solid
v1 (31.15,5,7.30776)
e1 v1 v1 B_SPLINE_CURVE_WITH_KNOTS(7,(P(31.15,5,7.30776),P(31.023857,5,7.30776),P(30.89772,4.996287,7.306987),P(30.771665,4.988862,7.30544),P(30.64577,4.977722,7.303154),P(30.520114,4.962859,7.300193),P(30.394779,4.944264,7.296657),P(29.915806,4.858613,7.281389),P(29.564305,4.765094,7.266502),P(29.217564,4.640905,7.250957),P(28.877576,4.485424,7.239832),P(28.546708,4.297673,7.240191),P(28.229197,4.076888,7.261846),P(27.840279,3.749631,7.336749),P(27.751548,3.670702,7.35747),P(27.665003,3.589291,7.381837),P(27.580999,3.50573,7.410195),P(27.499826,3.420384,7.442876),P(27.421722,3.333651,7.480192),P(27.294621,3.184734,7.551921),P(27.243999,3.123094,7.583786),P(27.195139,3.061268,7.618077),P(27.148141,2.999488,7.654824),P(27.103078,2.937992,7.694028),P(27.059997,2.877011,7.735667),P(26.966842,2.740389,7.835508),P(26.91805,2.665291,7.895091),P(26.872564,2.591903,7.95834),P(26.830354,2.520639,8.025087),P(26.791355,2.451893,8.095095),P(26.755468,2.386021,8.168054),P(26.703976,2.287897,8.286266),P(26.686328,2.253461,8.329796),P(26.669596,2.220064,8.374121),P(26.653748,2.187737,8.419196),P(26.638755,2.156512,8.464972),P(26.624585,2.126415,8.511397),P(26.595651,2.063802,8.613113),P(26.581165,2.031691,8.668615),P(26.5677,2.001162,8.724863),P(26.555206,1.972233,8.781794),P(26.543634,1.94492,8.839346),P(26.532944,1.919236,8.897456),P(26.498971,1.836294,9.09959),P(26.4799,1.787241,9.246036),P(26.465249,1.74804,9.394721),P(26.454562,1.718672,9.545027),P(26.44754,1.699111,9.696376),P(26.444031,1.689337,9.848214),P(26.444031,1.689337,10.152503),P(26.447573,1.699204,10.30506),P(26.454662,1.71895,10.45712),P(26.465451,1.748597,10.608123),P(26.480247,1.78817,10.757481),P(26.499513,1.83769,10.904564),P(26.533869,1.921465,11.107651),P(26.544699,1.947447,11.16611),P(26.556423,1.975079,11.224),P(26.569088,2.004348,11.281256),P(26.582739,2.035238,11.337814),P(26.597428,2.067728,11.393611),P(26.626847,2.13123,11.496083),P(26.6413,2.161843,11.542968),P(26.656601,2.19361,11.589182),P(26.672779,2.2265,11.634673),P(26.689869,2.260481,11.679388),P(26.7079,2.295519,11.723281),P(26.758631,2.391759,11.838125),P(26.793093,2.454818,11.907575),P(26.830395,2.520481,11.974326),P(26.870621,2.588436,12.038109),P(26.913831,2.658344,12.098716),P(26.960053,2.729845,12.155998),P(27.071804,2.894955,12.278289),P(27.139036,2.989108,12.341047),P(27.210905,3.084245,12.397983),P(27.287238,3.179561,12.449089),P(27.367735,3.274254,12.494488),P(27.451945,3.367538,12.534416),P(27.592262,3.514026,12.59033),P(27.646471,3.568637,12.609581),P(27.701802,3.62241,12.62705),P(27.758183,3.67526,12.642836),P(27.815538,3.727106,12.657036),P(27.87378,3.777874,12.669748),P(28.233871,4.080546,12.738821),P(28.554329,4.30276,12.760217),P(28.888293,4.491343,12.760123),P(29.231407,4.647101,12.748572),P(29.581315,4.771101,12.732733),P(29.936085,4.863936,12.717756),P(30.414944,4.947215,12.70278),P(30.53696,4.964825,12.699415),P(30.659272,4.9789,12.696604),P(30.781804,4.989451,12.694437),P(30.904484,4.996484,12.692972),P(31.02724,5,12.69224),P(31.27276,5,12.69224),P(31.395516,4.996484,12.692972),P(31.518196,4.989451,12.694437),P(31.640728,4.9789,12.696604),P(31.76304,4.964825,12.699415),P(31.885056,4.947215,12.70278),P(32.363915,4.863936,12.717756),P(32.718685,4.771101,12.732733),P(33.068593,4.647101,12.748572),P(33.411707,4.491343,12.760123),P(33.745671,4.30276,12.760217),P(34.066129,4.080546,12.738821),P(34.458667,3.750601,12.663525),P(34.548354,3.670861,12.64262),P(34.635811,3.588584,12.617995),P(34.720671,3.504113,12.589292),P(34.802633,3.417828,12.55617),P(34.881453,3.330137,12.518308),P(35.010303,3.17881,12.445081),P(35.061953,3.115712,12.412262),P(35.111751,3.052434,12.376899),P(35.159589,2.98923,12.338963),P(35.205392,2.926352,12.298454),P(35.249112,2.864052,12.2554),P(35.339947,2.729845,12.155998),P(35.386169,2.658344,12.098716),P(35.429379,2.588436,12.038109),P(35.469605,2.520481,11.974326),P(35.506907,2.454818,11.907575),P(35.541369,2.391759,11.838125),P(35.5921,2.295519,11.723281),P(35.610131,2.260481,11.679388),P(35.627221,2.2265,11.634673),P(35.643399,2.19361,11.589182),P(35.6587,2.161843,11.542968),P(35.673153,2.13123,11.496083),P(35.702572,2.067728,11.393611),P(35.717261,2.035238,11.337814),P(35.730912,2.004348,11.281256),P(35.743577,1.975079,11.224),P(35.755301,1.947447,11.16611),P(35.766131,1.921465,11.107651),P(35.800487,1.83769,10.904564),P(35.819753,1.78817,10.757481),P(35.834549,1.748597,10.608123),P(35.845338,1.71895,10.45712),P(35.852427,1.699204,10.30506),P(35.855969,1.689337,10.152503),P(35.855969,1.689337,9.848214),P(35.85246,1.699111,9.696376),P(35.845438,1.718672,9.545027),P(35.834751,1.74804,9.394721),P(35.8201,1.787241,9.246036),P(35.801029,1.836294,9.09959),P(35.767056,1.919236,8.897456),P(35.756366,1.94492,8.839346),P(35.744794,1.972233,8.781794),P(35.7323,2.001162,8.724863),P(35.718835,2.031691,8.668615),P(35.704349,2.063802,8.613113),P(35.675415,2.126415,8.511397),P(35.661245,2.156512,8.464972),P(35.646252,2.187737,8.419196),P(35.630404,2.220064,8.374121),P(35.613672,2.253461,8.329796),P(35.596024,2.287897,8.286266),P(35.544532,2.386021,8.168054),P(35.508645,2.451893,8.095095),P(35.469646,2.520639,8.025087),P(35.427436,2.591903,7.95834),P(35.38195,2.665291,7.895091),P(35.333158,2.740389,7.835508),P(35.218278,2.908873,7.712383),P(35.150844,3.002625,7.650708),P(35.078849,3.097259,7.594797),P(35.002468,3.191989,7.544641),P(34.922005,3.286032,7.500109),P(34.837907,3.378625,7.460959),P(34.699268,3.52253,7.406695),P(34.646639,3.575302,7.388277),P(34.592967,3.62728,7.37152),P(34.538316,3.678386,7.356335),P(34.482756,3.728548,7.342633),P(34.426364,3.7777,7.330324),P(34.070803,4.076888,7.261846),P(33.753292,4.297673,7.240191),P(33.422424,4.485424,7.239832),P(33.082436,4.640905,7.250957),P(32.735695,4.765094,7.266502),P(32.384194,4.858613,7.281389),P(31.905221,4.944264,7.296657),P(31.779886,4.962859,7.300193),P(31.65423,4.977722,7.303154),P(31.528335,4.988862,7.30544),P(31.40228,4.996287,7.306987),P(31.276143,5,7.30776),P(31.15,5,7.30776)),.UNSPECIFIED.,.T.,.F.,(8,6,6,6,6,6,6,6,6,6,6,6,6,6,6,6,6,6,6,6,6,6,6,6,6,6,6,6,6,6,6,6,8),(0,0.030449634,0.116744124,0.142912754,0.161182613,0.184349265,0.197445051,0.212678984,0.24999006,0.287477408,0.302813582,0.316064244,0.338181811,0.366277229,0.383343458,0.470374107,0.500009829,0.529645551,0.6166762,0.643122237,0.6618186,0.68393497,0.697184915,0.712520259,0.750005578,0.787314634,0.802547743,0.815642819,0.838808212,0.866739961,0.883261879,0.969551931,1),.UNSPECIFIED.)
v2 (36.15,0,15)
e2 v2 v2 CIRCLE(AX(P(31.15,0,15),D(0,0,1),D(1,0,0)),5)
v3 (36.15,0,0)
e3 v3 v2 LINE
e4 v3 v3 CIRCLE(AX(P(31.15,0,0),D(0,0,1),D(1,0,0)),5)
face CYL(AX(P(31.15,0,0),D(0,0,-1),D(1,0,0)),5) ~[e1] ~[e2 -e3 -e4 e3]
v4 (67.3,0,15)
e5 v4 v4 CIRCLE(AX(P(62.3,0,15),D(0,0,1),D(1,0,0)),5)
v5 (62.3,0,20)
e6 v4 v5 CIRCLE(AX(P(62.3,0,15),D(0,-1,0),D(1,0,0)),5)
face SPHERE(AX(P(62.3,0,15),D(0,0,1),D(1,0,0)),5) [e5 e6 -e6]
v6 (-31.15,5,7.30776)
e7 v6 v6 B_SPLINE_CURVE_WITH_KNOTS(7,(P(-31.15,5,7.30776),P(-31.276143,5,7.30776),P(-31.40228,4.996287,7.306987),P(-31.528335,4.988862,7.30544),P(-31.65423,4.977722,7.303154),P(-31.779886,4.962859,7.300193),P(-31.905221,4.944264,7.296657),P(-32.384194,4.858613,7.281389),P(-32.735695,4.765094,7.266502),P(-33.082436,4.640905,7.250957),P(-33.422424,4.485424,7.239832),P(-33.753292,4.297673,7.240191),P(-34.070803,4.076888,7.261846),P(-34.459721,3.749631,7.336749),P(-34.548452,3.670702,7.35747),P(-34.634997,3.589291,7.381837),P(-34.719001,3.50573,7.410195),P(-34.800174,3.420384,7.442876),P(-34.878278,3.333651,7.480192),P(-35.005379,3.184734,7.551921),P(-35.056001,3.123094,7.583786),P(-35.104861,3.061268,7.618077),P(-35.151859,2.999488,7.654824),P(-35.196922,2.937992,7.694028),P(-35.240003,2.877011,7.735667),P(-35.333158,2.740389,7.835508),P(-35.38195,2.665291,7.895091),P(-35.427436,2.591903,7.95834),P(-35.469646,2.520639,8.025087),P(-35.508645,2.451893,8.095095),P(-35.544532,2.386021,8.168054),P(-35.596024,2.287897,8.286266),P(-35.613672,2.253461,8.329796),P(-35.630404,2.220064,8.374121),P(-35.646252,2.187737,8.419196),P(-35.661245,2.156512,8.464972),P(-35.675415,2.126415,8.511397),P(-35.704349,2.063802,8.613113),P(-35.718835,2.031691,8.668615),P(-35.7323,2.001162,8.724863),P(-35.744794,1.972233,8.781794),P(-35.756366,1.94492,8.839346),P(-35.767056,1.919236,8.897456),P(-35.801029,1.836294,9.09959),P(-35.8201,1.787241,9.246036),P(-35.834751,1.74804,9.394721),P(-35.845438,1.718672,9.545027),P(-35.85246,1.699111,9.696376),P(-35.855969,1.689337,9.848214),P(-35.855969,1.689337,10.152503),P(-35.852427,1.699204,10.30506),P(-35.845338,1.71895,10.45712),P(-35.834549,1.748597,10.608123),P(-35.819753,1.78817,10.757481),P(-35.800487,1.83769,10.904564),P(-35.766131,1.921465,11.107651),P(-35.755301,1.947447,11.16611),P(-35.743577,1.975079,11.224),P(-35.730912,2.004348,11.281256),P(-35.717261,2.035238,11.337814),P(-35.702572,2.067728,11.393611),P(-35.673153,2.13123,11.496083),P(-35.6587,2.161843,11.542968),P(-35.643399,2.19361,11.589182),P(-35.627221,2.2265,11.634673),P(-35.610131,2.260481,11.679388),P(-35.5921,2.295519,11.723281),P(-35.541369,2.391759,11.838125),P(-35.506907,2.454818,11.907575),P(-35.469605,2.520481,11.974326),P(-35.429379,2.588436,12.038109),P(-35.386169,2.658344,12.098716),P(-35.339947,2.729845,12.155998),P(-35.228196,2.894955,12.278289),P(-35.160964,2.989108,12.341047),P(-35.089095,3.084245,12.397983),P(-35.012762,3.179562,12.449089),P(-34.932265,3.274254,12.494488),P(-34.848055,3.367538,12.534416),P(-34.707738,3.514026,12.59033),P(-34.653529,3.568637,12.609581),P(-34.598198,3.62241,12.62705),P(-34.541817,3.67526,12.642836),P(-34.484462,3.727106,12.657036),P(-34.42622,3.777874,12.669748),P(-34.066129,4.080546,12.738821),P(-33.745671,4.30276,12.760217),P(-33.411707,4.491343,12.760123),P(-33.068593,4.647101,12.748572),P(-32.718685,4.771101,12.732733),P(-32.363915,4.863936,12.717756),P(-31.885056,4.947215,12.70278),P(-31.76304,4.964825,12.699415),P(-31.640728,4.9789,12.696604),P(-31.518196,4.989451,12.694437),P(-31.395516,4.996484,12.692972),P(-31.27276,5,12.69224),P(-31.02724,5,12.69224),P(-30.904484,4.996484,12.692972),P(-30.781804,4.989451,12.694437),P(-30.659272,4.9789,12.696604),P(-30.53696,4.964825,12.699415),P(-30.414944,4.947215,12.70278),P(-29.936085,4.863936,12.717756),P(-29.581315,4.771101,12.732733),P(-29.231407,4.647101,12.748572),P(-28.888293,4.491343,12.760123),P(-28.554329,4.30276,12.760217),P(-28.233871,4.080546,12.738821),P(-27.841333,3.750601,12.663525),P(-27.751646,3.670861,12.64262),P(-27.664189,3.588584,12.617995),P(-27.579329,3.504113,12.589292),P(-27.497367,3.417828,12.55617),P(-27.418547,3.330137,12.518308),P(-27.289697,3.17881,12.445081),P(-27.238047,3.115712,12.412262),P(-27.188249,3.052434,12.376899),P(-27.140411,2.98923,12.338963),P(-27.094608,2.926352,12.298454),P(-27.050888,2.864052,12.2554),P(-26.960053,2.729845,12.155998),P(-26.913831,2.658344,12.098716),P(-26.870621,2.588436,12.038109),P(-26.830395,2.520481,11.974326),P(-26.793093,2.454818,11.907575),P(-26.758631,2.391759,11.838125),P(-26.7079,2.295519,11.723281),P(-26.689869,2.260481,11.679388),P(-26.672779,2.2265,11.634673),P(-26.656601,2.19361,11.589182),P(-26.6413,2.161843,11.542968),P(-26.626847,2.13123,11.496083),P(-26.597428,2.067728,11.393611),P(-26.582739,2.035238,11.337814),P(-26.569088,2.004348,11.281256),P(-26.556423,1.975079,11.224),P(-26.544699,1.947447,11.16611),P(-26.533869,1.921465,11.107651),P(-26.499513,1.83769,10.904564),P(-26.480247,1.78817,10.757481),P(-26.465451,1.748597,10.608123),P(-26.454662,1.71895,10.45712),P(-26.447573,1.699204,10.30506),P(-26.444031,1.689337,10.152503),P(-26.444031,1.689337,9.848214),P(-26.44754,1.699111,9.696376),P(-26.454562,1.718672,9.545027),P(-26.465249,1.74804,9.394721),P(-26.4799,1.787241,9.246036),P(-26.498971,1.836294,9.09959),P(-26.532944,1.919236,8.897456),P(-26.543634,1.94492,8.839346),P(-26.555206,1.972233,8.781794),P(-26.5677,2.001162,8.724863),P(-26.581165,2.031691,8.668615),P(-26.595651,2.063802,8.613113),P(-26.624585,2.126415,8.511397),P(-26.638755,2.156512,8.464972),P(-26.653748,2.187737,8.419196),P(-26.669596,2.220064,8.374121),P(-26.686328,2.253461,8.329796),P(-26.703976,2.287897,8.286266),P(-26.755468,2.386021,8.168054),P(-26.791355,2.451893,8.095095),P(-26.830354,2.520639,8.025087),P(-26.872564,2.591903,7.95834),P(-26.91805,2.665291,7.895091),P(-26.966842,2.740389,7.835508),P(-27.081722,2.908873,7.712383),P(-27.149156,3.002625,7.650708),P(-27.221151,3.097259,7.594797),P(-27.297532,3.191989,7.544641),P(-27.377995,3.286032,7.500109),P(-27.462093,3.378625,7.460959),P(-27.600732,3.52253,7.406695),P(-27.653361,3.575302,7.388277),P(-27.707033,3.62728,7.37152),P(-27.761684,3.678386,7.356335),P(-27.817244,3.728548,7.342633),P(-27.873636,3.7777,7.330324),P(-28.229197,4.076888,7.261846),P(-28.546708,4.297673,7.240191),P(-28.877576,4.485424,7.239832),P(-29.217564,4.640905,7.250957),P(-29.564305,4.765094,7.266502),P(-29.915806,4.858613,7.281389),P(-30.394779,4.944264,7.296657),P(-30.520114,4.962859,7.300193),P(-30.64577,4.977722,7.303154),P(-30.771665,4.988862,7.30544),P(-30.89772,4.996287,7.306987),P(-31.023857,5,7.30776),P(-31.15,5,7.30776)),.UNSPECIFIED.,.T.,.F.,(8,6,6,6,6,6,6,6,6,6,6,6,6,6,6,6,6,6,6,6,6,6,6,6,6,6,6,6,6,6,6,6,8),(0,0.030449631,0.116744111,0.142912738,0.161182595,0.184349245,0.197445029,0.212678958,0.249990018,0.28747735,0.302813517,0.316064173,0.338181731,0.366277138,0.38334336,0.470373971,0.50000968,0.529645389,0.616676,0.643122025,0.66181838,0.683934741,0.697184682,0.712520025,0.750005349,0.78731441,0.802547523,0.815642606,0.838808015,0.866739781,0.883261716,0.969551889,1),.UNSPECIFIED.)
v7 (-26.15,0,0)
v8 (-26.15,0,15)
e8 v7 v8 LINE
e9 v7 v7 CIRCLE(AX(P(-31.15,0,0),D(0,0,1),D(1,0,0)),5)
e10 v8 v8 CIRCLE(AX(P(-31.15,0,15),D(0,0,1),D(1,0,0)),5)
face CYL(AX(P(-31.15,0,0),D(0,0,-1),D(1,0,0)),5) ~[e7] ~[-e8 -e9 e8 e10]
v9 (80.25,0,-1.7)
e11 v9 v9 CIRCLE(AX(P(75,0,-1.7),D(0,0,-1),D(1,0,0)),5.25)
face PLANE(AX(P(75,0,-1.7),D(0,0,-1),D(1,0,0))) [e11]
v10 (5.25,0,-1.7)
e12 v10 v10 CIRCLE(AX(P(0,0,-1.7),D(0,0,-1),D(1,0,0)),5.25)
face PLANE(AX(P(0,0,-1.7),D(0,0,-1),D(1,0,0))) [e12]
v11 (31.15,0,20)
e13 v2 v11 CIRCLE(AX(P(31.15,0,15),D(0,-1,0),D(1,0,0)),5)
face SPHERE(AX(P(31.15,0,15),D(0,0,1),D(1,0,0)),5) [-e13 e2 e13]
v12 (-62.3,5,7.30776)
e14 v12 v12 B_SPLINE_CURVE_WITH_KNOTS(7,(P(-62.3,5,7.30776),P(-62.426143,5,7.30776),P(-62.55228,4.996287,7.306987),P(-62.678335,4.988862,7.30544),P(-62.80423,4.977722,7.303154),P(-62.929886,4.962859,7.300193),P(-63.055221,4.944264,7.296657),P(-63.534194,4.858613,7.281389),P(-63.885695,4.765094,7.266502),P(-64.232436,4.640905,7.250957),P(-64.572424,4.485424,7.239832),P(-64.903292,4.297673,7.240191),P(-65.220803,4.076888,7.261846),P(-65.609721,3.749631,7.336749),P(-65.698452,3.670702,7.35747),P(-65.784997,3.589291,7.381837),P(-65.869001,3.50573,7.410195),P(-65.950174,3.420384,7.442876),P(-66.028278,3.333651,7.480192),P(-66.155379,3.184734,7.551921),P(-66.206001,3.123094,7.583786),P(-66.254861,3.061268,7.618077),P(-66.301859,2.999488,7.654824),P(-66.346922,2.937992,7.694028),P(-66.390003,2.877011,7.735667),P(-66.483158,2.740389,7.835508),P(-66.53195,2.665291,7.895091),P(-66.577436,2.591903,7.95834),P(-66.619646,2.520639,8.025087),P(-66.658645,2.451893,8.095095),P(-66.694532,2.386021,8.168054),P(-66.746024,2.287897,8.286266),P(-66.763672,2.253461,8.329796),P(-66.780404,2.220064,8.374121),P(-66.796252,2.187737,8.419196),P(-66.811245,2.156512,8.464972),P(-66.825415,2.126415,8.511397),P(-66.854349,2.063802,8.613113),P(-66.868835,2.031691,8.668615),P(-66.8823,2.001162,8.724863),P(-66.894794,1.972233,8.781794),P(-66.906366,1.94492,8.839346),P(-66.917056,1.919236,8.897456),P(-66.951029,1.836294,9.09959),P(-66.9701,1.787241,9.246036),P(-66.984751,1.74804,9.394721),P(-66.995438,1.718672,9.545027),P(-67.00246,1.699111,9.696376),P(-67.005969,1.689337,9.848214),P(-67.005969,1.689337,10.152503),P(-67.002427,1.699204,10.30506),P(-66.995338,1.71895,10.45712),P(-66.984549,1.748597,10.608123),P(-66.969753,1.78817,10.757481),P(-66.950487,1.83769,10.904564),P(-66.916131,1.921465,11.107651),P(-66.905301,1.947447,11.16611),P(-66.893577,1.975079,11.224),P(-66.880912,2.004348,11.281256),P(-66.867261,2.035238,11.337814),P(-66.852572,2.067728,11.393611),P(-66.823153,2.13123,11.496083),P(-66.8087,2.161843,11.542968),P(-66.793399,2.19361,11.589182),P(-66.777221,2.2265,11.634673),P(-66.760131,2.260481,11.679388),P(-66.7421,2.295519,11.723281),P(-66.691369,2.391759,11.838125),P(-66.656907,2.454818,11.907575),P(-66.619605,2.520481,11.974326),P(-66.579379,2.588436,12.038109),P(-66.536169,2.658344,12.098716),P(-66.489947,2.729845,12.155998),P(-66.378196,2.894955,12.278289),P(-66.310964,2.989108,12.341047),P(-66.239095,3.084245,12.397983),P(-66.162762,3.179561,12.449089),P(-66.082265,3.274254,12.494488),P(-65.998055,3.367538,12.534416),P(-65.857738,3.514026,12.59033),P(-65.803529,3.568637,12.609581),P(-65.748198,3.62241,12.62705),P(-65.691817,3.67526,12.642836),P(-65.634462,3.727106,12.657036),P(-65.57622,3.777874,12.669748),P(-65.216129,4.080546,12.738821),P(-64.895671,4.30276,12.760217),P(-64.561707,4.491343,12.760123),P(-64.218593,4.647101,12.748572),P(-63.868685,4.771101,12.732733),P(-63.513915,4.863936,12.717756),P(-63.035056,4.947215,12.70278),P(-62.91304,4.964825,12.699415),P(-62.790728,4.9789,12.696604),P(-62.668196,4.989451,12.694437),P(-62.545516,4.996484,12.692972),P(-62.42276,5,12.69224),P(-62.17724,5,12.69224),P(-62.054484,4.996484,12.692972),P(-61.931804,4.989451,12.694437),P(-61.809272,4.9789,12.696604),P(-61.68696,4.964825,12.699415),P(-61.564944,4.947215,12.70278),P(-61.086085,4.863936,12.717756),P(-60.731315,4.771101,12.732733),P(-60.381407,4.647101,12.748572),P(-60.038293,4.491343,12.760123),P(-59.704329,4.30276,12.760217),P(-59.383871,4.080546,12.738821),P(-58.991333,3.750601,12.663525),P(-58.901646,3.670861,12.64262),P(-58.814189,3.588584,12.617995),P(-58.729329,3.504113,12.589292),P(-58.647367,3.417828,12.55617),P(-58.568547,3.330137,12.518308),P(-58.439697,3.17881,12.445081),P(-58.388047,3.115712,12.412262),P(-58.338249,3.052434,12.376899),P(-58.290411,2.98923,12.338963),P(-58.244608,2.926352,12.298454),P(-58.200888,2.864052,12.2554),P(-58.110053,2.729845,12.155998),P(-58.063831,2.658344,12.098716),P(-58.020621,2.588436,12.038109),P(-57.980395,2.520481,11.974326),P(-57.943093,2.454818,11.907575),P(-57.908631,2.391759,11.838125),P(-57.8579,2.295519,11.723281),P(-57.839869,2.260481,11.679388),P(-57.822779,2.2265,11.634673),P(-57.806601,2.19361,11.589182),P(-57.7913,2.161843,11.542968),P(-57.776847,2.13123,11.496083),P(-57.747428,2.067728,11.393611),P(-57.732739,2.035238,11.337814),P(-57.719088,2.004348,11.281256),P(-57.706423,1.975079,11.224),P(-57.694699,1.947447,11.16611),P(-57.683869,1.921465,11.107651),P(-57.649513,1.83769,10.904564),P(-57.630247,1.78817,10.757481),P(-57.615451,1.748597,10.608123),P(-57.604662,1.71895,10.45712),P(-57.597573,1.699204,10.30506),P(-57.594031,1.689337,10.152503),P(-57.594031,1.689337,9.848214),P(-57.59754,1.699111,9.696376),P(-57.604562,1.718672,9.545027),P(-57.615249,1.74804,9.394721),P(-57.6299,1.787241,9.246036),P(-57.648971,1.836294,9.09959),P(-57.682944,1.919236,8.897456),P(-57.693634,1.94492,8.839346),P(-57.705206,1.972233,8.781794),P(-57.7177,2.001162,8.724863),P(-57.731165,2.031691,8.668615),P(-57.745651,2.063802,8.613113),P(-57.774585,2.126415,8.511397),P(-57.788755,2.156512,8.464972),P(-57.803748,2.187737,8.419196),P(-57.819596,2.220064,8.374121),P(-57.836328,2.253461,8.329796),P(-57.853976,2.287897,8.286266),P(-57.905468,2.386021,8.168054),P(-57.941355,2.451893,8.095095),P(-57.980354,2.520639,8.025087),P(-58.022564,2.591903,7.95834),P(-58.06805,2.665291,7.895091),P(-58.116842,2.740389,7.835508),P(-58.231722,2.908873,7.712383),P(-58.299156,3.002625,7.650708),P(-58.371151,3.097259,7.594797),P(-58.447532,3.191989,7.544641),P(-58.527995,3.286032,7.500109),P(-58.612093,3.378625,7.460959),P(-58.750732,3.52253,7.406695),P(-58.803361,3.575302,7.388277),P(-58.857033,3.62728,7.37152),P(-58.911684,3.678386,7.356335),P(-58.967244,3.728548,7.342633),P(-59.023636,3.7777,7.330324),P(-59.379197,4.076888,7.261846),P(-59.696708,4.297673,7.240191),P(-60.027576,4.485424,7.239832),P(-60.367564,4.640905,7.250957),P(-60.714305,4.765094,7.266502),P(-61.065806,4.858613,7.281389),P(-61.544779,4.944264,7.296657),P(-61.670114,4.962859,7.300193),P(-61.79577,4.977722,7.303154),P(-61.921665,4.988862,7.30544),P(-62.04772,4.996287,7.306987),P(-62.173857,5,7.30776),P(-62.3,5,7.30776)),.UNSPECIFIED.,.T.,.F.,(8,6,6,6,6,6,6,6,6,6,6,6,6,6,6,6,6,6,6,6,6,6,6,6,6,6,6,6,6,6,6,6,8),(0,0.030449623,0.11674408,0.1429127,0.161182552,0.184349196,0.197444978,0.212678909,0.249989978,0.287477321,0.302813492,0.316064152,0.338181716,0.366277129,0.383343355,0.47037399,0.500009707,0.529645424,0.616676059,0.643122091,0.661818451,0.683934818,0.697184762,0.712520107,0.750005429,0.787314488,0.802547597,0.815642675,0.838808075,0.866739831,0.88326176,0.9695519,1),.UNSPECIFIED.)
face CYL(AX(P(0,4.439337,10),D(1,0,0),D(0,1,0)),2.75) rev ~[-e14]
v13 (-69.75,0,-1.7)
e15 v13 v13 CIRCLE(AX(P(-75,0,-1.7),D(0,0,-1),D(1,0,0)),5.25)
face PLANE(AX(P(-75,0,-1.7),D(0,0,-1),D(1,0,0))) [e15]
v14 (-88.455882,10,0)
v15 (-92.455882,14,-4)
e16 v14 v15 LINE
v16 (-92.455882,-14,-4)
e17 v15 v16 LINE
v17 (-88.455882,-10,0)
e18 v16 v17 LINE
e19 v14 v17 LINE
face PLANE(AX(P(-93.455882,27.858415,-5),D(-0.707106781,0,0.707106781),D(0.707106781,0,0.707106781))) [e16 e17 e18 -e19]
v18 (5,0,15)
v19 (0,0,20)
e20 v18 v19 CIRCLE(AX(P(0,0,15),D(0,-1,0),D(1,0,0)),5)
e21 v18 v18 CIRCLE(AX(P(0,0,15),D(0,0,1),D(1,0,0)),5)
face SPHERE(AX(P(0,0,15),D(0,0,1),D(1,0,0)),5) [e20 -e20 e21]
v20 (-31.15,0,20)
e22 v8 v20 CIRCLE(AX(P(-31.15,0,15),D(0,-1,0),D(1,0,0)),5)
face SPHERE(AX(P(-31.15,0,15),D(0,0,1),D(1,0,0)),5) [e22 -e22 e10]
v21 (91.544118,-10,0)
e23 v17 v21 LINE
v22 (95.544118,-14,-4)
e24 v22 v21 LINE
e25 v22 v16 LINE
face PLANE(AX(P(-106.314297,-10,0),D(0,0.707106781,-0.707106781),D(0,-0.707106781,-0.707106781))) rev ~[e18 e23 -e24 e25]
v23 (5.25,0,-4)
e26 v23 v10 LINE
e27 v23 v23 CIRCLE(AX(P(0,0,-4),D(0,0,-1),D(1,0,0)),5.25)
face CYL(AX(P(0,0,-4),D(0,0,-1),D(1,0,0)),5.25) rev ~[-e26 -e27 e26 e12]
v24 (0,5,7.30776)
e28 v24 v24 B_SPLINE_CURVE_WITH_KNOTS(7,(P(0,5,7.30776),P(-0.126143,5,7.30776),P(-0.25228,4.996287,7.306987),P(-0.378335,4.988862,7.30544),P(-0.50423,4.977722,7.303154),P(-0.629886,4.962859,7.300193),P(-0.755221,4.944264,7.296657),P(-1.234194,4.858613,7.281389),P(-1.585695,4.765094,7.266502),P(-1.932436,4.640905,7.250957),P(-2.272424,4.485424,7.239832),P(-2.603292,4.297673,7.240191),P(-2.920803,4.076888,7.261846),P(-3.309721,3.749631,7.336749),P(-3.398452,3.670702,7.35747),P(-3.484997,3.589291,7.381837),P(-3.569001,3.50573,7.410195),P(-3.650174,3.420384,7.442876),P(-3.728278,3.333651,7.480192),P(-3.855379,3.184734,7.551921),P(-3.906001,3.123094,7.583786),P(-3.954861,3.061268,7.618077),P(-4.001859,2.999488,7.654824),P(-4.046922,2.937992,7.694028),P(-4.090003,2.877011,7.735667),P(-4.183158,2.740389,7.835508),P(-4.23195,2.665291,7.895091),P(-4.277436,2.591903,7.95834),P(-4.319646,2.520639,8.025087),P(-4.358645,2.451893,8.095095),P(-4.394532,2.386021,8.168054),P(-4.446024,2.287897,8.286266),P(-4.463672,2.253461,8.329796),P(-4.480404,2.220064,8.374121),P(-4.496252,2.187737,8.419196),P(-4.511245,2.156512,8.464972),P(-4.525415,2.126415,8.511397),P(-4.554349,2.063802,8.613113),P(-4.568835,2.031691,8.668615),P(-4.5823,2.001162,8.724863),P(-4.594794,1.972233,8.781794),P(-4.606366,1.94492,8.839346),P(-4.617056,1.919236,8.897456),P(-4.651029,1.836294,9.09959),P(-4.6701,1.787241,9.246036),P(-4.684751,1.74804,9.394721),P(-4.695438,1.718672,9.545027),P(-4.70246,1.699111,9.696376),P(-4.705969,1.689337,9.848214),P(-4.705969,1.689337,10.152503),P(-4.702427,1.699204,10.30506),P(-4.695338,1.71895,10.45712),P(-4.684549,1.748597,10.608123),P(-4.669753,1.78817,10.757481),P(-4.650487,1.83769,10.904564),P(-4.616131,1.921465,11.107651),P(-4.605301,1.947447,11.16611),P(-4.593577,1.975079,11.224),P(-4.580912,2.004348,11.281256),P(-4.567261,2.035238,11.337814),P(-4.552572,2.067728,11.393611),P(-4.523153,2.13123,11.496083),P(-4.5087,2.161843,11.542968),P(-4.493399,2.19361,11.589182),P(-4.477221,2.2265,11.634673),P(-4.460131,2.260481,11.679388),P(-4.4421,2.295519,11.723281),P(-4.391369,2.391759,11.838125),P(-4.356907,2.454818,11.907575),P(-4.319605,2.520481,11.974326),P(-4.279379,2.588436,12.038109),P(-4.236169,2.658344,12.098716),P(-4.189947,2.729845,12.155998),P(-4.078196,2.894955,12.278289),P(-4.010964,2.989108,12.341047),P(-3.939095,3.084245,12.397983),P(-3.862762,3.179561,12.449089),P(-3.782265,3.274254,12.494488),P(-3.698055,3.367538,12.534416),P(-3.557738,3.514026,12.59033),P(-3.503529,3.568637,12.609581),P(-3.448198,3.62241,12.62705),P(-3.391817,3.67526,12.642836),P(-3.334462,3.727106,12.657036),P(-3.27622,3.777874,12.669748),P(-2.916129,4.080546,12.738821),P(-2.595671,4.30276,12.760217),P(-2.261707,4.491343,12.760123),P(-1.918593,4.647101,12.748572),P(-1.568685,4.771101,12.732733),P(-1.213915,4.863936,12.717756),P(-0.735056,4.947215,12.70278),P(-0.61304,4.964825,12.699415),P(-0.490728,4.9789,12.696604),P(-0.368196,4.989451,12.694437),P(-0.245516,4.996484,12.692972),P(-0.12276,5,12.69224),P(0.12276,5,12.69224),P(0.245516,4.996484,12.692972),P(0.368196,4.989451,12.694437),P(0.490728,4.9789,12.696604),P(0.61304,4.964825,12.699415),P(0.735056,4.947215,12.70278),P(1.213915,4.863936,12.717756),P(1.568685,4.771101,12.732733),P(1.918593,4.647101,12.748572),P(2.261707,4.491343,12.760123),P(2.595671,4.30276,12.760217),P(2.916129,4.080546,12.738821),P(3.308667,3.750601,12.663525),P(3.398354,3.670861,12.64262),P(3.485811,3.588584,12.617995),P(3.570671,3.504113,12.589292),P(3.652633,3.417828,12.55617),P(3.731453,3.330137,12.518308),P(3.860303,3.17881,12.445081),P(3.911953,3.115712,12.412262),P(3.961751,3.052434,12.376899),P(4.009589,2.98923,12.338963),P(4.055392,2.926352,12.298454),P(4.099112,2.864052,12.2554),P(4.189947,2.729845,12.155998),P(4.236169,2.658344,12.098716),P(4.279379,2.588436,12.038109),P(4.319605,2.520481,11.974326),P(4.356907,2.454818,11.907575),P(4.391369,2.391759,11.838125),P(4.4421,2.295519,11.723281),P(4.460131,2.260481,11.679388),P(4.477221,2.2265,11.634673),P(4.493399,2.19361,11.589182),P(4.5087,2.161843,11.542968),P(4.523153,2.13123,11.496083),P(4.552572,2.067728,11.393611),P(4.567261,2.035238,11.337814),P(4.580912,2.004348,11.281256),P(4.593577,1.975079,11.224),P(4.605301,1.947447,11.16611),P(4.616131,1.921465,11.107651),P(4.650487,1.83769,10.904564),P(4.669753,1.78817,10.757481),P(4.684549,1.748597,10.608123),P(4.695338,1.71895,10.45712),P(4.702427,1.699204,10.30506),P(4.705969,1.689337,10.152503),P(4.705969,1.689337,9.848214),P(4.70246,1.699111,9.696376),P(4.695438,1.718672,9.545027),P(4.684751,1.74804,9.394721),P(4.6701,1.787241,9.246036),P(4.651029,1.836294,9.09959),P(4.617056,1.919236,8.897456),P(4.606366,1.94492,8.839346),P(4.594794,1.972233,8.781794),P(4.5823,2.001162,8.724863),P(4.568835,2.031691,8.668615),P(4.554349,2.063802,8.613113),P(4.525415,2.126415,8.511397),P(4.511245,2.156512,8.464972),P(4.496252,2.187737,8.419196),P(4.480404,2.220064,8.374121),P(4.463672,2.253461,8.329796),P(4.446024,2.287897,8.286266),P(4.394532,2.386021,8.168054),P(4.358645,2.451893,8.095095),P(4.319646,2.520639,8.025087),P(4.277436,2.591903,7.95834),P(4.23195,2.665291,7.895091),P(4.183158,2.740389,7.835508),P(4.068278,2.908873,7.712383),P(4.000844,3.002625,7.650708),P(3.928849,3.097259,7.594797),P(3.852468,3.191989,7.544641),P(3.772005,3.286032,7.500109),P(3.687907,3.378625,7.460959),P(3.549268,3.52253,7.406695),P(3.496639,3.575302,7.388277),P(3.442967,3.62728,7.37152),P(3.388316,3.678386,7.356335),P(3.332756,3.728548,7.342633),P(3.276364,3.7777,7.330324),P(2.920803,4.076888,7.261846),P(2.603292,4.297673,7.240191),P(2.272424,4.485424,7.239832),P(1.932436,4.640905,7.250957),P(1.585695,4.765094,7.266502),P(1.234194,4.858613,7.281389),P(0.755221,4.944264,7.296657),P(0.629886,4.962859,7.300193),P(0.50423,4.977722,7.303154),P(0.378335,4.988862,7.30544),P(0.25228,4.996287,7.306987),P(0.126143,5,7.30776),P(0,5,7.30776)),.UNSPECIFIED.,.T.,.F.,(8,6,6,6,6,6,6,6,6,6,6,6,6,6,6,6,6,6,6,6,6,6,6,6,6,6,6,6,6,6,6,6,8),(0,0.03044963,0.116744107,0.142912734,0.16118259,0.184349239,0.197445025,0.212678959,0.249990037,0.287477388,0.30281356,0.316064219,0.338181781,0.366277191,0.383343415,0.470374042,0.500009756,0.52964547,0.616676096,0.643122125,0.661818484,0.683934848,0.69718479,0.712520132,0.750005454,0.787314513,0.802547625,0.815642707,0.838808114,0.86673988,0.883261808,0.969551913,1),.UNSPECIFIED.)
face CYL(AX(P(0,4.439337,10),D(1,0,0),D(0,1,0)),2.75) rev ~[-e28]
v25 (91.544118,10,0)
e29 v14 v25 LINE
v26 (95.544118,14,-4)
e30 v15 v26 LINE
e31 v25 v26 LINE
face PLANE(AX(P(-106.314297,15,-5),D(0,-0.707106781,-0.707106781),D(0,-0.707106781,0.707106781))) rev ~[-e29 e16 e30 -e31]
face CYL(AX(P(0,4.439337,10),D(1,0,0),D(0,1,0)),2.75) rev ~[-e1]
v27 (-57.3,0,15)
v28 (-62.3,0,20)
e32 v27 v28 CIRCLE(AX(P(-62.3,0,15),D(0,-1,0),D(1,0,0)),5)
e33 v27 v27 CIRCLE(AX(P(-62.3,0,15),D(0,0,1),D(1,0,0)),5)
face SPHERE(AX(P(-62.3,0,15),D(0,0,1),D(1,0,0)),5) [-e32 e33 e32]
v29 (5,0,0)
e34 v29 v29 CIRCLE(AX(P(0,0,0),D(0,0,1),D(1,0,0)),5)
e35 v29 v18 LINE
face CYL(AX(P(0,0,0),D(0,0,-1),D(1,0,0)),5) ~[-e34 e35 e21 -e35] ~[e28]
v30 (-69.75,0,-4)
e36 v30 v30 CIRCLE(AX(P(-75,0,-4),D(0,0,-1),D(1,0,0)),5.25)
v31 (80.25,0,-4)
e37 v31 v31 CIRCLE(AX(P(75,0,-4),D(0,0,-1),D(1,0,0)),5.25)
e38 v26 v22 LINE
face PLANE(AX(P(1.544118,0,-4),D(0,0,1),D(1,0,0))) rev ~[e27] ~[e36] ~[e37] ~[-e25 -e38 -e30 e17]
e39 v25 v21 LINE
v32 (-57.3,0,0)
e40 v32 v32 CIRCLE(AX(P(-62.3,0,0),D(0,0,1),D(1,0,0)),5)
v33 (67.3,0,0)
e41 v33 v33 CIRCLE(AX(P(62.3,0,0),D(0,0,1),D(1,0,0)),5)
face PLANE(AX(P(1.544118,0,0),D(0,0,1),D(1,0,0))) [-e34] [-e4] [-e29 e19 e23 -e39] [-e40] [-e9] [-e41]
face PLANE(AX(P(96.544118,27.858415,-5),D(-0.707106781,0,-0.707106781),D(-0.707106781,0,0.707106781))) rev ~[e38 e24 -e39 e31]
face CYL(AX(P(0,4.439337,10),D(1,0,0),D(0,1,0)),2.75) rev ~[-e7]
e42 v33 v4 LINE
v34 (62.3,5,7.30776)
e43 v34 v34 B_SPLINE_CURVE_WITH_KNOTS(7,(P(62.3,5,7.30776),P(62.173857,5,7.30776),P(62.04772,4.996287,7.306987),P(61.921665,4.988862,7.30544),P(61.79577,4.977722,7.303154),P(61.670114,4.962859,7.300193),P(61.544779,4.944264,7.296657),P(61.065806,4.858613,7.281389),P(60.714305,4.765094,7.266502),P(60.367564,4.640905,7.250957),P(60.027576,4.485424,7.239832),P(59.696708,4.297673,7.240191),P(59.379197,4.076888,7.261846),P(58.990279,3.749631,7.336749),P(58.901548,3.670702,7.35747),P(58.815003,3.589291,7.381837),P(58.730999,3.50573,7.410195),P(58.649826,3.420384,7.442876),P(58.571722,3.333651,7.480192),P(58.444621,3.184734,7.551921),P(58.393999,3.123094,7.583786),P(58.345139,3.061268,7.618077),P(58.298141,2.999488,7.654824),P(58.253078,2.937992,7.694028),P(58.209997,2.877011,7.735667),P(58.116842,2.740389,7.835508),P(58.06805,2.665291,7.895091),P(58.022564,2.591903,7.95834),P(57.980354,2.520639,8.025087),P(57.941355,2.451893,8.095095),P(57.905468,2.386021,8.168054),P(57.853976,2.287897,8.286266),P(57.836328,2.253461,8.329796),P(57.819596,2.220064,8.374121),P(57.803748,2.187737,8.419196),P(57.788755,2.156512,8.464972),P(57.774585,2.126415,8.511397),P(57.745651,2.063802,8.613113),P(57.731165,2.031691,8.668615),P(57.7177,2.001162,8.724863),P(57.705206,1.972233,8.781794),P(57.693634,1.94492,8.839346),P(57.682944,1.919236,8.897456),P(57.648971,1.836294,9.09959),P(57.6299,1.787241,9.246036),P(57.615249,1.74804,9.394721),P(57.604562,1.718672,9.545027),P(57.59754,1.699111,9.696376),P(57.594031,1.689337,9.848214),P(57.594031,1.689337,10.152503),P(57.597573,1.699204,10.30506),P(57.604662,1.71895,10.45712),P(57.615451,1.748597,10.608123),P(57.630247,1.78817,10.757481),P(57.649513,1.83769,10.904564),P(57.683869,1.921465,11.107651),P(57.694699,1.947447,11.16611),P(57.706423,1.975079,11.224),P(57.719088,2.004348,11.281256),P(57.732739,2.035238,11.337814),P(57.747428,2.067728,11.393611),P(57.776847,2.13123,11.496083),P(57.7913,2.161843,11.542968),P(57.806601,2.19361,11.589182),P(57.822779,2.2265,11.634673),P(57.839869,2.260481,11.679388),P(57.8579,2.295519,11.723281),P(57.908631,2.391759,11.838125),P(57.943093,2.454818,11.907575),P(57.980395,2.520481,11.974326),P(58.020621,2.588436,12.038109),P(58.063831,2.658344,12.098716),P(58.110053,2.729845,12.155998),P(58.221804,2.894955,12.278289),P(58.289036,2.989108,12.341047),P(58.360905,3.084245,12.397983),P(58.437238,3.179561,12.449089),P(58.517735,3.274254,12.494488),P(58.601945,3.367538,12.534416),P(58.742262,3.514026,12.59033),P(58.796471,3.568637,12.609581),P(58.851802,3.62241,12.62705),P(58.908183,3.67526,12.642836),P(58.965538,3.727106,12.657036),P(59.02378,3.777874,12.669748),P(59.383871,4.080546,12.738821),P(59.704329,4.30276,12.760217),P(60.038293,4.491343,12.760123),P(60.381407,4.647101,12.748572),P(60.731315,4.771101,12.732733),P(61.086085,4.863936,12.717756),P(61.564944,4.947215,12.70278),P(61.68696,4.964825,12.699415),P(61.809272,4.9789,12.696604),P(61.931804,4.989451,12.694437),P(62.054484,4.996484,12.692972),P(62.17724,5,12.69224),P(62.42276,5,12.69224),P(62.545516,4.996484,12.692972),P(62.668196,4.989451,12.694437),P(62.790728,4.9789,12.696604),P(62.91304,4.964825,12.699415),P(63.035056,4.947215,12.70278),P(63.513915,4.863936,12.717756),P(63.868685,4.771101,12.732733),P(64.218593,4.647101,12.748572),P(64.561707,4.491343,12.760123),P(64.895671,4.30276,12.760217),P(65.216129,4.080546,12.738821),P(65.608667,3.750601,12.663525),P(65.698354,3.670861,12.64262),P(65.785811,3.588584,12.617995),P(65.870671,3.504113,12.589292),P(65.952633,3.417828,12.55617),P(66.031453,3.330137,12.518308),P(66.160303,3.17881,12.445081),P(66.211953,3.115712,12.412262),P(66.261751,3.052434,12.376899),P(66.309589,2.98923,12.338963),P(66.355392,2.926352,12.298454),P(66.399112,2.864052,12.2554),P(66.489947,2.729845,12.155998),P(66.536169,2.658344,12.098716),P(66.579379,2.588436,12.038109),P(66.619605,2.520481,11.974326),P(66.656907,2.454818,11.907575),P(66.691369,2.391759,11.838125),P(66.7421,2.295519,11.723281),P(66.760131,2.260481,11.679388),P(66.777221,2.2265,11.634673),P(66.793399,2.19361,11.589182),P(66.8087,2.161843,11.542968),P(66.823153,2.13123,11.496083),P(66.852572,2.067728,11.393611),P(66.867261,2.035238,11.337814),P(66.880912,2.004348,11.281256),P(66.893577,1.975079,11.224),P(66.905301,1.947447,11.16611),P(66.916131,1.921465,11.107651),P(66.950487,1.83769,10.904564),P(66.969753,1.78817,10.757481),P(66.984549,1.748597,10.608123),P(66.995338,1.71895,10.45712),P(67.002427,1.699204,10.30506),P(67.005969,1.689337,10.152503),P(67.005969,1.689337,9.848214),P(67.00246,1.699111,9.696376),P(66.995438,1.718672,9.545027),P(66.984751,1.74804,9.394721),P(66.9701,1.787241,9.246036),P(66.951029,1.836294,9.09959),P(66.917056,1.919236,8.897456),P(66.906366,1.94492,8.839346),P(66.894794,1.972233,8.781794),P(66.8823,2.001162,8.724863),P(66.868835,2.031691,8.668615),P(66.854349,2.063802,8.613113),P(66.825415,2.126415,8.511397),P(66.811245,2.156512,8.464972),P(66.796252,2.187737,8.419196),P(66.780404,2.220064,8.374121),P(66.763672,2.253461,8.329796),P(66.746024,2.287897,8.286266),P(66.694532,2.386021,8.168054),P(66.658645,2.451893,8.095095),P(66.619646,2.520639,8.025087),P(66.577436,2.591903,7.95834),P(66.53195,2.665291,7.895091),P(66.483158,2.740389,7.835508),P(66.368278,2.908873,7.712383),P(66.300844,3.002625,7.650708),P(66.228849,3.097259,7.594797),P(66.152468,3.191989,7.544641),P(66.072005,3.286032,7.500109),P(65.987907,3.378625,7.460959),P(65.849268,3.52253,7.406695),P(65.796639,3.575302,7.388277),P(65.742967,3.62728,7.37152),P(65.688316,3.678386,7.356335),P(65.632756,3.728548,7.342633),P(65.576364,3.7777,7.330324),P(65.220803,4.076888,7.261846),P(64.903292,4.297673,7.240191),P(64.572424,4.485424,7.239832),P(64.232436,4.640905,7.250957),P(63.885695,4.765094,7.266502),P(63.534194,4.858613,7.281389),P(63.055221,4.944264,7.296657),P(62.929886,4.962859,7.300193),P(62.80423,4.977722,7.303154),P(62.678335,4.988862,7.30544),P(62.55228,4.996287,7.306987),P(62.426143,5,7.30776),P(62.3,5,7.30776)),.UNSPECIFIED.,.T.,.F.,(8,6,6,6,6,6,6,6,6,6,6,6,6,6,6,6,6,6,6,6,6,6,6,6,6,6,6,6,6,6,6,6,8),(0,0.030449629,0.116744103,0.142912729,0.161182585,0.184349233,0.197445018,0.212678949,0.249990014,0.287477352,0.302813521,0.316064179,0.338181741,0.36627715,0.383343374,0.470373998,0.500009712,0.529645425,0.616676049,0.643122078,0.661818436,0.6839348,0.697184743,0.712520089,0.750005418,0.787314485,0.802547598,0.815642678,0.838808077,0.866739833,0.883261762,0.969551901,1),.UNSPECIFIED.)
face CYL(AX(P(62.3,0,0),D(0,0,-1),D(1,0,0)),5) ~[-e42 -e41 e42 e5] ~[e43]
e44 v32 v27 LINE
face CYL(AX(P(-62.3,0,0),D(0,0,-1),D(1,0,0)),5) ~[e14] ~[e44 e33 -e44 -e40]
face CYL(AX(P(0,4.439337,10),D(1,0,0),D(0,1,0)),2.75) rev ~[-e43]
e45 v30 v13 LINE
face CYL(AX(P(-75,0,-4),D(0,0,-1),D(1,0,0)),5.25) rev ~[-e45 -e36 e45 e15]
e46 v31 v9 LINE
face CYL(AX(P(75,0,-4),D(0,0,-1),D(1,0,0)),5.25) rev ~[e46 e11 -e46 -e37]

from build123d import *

# Parameters (mm, degrees)
F0_W        = 190
F0_H        = 30
F1_DEPTH    = 4
F2_R        = 5
F3_DEPTH    = 20
F4_R        = 5.25
F5_DEPTH    = 2.3
F6_T1_DEPTH = 215.7168298797
F6_T3_DEPTH = 55.7168298797
F7_R        = 2.75
F8_DEPTH    = 75
F9_R        = 5


# Not quite as in the source:
# - a fillet or chamfer that OpenCascade refuses, or shapes differently, is made with other operations: its cross-section is extruded or revolved along the edge and cut away or added


with BuildPart() as f1:
    # F0 (on Top) → F1 (new body)
    with BuildSketch(Plane.XY):
        with Locations((1.5441179276, 0)):
            Rectangle(F0_W, F0_H)
    extrude(amount=-F1_DEPTH)

    # F2 (on Top) → F3 (join)
    with BuildSketch(Plane.XY):
        with Locations((-62.3, 0)):
            Circle(F2_R)
        with Locations((-31.15, 0)):
            Circle(F2_R)
        Circle(F2_R)
        with Locations((31.15, 0)):
            Circle(F2_R)
        with Locations((62.3, 0)):
            Circle(F2_R)
    extrude(amount=F3_DEPTH)

    # F4 (on face) → F5 (cut)
    with BuildSketch(Plane(origin=(0, 0, -4), x_dir=(1, 0, 0), z_dir=(0, 0, -1))):
        with Locations((-75, 0)):
            Circle(F4_R)
        Circle(F4_R)
        with Locations((75, 0)):
            Circle(F4_R)
    extrude(amount=-F5_DEPTH, mode=Mode.SUBTRACT)

    # F6: chamfer of 5 on 4 edges, made by hand

    # F6_s2 → F6_t1 (cut)
    with BuildSketch(Plane.YZ.offset(-106.3142970123)):
        Polygon((15, -5), (10, 0), (15, 0), align=None)
        Polygon((-10, 0), (-15, -5), (-15, 0), align=None)
    extrude(amount=F6_T1_DEPTH, mode=Mode.SUBTRACT)

    # F6_s4 → F6_t3 (cut)
    with BuildSketch(Plane.XZ.offset(-27.8584149398)):
        Polygon((96.5441179276, -5), (91.5441179276, 0), (96.5441179276, 0), align=None)
        Polygon((-93.4558820724, -5), (-88.4558820724, 0), (-93.4558820724, 0), align=None)
    extrude(amount=F6_T3_DEPTH, mode=Mode.SUBTRACT)

    # F7 (on Right) → F8 (cut, symmetric)
    with BuildSketch(Plane.YZ):
        with Locations((4.4393371791, 10)):
            Circle(F7_R)
    extrude(amount=F8_DEPTH, both=True, mode=Mode.SUBTRACT)

    # F9
    f9_edges = [f1.edges().sort_by_distance(p)[0] for p in [
        (-67.3, 0, 20),
        (-36.15, 0, 20),
        (-5, 0, 20),
        (26.15, 0, 20),
        (57.3, 0, 20),
    ]]
    fillet(f9_edges, radius=F9_R)


solid = f1.part
